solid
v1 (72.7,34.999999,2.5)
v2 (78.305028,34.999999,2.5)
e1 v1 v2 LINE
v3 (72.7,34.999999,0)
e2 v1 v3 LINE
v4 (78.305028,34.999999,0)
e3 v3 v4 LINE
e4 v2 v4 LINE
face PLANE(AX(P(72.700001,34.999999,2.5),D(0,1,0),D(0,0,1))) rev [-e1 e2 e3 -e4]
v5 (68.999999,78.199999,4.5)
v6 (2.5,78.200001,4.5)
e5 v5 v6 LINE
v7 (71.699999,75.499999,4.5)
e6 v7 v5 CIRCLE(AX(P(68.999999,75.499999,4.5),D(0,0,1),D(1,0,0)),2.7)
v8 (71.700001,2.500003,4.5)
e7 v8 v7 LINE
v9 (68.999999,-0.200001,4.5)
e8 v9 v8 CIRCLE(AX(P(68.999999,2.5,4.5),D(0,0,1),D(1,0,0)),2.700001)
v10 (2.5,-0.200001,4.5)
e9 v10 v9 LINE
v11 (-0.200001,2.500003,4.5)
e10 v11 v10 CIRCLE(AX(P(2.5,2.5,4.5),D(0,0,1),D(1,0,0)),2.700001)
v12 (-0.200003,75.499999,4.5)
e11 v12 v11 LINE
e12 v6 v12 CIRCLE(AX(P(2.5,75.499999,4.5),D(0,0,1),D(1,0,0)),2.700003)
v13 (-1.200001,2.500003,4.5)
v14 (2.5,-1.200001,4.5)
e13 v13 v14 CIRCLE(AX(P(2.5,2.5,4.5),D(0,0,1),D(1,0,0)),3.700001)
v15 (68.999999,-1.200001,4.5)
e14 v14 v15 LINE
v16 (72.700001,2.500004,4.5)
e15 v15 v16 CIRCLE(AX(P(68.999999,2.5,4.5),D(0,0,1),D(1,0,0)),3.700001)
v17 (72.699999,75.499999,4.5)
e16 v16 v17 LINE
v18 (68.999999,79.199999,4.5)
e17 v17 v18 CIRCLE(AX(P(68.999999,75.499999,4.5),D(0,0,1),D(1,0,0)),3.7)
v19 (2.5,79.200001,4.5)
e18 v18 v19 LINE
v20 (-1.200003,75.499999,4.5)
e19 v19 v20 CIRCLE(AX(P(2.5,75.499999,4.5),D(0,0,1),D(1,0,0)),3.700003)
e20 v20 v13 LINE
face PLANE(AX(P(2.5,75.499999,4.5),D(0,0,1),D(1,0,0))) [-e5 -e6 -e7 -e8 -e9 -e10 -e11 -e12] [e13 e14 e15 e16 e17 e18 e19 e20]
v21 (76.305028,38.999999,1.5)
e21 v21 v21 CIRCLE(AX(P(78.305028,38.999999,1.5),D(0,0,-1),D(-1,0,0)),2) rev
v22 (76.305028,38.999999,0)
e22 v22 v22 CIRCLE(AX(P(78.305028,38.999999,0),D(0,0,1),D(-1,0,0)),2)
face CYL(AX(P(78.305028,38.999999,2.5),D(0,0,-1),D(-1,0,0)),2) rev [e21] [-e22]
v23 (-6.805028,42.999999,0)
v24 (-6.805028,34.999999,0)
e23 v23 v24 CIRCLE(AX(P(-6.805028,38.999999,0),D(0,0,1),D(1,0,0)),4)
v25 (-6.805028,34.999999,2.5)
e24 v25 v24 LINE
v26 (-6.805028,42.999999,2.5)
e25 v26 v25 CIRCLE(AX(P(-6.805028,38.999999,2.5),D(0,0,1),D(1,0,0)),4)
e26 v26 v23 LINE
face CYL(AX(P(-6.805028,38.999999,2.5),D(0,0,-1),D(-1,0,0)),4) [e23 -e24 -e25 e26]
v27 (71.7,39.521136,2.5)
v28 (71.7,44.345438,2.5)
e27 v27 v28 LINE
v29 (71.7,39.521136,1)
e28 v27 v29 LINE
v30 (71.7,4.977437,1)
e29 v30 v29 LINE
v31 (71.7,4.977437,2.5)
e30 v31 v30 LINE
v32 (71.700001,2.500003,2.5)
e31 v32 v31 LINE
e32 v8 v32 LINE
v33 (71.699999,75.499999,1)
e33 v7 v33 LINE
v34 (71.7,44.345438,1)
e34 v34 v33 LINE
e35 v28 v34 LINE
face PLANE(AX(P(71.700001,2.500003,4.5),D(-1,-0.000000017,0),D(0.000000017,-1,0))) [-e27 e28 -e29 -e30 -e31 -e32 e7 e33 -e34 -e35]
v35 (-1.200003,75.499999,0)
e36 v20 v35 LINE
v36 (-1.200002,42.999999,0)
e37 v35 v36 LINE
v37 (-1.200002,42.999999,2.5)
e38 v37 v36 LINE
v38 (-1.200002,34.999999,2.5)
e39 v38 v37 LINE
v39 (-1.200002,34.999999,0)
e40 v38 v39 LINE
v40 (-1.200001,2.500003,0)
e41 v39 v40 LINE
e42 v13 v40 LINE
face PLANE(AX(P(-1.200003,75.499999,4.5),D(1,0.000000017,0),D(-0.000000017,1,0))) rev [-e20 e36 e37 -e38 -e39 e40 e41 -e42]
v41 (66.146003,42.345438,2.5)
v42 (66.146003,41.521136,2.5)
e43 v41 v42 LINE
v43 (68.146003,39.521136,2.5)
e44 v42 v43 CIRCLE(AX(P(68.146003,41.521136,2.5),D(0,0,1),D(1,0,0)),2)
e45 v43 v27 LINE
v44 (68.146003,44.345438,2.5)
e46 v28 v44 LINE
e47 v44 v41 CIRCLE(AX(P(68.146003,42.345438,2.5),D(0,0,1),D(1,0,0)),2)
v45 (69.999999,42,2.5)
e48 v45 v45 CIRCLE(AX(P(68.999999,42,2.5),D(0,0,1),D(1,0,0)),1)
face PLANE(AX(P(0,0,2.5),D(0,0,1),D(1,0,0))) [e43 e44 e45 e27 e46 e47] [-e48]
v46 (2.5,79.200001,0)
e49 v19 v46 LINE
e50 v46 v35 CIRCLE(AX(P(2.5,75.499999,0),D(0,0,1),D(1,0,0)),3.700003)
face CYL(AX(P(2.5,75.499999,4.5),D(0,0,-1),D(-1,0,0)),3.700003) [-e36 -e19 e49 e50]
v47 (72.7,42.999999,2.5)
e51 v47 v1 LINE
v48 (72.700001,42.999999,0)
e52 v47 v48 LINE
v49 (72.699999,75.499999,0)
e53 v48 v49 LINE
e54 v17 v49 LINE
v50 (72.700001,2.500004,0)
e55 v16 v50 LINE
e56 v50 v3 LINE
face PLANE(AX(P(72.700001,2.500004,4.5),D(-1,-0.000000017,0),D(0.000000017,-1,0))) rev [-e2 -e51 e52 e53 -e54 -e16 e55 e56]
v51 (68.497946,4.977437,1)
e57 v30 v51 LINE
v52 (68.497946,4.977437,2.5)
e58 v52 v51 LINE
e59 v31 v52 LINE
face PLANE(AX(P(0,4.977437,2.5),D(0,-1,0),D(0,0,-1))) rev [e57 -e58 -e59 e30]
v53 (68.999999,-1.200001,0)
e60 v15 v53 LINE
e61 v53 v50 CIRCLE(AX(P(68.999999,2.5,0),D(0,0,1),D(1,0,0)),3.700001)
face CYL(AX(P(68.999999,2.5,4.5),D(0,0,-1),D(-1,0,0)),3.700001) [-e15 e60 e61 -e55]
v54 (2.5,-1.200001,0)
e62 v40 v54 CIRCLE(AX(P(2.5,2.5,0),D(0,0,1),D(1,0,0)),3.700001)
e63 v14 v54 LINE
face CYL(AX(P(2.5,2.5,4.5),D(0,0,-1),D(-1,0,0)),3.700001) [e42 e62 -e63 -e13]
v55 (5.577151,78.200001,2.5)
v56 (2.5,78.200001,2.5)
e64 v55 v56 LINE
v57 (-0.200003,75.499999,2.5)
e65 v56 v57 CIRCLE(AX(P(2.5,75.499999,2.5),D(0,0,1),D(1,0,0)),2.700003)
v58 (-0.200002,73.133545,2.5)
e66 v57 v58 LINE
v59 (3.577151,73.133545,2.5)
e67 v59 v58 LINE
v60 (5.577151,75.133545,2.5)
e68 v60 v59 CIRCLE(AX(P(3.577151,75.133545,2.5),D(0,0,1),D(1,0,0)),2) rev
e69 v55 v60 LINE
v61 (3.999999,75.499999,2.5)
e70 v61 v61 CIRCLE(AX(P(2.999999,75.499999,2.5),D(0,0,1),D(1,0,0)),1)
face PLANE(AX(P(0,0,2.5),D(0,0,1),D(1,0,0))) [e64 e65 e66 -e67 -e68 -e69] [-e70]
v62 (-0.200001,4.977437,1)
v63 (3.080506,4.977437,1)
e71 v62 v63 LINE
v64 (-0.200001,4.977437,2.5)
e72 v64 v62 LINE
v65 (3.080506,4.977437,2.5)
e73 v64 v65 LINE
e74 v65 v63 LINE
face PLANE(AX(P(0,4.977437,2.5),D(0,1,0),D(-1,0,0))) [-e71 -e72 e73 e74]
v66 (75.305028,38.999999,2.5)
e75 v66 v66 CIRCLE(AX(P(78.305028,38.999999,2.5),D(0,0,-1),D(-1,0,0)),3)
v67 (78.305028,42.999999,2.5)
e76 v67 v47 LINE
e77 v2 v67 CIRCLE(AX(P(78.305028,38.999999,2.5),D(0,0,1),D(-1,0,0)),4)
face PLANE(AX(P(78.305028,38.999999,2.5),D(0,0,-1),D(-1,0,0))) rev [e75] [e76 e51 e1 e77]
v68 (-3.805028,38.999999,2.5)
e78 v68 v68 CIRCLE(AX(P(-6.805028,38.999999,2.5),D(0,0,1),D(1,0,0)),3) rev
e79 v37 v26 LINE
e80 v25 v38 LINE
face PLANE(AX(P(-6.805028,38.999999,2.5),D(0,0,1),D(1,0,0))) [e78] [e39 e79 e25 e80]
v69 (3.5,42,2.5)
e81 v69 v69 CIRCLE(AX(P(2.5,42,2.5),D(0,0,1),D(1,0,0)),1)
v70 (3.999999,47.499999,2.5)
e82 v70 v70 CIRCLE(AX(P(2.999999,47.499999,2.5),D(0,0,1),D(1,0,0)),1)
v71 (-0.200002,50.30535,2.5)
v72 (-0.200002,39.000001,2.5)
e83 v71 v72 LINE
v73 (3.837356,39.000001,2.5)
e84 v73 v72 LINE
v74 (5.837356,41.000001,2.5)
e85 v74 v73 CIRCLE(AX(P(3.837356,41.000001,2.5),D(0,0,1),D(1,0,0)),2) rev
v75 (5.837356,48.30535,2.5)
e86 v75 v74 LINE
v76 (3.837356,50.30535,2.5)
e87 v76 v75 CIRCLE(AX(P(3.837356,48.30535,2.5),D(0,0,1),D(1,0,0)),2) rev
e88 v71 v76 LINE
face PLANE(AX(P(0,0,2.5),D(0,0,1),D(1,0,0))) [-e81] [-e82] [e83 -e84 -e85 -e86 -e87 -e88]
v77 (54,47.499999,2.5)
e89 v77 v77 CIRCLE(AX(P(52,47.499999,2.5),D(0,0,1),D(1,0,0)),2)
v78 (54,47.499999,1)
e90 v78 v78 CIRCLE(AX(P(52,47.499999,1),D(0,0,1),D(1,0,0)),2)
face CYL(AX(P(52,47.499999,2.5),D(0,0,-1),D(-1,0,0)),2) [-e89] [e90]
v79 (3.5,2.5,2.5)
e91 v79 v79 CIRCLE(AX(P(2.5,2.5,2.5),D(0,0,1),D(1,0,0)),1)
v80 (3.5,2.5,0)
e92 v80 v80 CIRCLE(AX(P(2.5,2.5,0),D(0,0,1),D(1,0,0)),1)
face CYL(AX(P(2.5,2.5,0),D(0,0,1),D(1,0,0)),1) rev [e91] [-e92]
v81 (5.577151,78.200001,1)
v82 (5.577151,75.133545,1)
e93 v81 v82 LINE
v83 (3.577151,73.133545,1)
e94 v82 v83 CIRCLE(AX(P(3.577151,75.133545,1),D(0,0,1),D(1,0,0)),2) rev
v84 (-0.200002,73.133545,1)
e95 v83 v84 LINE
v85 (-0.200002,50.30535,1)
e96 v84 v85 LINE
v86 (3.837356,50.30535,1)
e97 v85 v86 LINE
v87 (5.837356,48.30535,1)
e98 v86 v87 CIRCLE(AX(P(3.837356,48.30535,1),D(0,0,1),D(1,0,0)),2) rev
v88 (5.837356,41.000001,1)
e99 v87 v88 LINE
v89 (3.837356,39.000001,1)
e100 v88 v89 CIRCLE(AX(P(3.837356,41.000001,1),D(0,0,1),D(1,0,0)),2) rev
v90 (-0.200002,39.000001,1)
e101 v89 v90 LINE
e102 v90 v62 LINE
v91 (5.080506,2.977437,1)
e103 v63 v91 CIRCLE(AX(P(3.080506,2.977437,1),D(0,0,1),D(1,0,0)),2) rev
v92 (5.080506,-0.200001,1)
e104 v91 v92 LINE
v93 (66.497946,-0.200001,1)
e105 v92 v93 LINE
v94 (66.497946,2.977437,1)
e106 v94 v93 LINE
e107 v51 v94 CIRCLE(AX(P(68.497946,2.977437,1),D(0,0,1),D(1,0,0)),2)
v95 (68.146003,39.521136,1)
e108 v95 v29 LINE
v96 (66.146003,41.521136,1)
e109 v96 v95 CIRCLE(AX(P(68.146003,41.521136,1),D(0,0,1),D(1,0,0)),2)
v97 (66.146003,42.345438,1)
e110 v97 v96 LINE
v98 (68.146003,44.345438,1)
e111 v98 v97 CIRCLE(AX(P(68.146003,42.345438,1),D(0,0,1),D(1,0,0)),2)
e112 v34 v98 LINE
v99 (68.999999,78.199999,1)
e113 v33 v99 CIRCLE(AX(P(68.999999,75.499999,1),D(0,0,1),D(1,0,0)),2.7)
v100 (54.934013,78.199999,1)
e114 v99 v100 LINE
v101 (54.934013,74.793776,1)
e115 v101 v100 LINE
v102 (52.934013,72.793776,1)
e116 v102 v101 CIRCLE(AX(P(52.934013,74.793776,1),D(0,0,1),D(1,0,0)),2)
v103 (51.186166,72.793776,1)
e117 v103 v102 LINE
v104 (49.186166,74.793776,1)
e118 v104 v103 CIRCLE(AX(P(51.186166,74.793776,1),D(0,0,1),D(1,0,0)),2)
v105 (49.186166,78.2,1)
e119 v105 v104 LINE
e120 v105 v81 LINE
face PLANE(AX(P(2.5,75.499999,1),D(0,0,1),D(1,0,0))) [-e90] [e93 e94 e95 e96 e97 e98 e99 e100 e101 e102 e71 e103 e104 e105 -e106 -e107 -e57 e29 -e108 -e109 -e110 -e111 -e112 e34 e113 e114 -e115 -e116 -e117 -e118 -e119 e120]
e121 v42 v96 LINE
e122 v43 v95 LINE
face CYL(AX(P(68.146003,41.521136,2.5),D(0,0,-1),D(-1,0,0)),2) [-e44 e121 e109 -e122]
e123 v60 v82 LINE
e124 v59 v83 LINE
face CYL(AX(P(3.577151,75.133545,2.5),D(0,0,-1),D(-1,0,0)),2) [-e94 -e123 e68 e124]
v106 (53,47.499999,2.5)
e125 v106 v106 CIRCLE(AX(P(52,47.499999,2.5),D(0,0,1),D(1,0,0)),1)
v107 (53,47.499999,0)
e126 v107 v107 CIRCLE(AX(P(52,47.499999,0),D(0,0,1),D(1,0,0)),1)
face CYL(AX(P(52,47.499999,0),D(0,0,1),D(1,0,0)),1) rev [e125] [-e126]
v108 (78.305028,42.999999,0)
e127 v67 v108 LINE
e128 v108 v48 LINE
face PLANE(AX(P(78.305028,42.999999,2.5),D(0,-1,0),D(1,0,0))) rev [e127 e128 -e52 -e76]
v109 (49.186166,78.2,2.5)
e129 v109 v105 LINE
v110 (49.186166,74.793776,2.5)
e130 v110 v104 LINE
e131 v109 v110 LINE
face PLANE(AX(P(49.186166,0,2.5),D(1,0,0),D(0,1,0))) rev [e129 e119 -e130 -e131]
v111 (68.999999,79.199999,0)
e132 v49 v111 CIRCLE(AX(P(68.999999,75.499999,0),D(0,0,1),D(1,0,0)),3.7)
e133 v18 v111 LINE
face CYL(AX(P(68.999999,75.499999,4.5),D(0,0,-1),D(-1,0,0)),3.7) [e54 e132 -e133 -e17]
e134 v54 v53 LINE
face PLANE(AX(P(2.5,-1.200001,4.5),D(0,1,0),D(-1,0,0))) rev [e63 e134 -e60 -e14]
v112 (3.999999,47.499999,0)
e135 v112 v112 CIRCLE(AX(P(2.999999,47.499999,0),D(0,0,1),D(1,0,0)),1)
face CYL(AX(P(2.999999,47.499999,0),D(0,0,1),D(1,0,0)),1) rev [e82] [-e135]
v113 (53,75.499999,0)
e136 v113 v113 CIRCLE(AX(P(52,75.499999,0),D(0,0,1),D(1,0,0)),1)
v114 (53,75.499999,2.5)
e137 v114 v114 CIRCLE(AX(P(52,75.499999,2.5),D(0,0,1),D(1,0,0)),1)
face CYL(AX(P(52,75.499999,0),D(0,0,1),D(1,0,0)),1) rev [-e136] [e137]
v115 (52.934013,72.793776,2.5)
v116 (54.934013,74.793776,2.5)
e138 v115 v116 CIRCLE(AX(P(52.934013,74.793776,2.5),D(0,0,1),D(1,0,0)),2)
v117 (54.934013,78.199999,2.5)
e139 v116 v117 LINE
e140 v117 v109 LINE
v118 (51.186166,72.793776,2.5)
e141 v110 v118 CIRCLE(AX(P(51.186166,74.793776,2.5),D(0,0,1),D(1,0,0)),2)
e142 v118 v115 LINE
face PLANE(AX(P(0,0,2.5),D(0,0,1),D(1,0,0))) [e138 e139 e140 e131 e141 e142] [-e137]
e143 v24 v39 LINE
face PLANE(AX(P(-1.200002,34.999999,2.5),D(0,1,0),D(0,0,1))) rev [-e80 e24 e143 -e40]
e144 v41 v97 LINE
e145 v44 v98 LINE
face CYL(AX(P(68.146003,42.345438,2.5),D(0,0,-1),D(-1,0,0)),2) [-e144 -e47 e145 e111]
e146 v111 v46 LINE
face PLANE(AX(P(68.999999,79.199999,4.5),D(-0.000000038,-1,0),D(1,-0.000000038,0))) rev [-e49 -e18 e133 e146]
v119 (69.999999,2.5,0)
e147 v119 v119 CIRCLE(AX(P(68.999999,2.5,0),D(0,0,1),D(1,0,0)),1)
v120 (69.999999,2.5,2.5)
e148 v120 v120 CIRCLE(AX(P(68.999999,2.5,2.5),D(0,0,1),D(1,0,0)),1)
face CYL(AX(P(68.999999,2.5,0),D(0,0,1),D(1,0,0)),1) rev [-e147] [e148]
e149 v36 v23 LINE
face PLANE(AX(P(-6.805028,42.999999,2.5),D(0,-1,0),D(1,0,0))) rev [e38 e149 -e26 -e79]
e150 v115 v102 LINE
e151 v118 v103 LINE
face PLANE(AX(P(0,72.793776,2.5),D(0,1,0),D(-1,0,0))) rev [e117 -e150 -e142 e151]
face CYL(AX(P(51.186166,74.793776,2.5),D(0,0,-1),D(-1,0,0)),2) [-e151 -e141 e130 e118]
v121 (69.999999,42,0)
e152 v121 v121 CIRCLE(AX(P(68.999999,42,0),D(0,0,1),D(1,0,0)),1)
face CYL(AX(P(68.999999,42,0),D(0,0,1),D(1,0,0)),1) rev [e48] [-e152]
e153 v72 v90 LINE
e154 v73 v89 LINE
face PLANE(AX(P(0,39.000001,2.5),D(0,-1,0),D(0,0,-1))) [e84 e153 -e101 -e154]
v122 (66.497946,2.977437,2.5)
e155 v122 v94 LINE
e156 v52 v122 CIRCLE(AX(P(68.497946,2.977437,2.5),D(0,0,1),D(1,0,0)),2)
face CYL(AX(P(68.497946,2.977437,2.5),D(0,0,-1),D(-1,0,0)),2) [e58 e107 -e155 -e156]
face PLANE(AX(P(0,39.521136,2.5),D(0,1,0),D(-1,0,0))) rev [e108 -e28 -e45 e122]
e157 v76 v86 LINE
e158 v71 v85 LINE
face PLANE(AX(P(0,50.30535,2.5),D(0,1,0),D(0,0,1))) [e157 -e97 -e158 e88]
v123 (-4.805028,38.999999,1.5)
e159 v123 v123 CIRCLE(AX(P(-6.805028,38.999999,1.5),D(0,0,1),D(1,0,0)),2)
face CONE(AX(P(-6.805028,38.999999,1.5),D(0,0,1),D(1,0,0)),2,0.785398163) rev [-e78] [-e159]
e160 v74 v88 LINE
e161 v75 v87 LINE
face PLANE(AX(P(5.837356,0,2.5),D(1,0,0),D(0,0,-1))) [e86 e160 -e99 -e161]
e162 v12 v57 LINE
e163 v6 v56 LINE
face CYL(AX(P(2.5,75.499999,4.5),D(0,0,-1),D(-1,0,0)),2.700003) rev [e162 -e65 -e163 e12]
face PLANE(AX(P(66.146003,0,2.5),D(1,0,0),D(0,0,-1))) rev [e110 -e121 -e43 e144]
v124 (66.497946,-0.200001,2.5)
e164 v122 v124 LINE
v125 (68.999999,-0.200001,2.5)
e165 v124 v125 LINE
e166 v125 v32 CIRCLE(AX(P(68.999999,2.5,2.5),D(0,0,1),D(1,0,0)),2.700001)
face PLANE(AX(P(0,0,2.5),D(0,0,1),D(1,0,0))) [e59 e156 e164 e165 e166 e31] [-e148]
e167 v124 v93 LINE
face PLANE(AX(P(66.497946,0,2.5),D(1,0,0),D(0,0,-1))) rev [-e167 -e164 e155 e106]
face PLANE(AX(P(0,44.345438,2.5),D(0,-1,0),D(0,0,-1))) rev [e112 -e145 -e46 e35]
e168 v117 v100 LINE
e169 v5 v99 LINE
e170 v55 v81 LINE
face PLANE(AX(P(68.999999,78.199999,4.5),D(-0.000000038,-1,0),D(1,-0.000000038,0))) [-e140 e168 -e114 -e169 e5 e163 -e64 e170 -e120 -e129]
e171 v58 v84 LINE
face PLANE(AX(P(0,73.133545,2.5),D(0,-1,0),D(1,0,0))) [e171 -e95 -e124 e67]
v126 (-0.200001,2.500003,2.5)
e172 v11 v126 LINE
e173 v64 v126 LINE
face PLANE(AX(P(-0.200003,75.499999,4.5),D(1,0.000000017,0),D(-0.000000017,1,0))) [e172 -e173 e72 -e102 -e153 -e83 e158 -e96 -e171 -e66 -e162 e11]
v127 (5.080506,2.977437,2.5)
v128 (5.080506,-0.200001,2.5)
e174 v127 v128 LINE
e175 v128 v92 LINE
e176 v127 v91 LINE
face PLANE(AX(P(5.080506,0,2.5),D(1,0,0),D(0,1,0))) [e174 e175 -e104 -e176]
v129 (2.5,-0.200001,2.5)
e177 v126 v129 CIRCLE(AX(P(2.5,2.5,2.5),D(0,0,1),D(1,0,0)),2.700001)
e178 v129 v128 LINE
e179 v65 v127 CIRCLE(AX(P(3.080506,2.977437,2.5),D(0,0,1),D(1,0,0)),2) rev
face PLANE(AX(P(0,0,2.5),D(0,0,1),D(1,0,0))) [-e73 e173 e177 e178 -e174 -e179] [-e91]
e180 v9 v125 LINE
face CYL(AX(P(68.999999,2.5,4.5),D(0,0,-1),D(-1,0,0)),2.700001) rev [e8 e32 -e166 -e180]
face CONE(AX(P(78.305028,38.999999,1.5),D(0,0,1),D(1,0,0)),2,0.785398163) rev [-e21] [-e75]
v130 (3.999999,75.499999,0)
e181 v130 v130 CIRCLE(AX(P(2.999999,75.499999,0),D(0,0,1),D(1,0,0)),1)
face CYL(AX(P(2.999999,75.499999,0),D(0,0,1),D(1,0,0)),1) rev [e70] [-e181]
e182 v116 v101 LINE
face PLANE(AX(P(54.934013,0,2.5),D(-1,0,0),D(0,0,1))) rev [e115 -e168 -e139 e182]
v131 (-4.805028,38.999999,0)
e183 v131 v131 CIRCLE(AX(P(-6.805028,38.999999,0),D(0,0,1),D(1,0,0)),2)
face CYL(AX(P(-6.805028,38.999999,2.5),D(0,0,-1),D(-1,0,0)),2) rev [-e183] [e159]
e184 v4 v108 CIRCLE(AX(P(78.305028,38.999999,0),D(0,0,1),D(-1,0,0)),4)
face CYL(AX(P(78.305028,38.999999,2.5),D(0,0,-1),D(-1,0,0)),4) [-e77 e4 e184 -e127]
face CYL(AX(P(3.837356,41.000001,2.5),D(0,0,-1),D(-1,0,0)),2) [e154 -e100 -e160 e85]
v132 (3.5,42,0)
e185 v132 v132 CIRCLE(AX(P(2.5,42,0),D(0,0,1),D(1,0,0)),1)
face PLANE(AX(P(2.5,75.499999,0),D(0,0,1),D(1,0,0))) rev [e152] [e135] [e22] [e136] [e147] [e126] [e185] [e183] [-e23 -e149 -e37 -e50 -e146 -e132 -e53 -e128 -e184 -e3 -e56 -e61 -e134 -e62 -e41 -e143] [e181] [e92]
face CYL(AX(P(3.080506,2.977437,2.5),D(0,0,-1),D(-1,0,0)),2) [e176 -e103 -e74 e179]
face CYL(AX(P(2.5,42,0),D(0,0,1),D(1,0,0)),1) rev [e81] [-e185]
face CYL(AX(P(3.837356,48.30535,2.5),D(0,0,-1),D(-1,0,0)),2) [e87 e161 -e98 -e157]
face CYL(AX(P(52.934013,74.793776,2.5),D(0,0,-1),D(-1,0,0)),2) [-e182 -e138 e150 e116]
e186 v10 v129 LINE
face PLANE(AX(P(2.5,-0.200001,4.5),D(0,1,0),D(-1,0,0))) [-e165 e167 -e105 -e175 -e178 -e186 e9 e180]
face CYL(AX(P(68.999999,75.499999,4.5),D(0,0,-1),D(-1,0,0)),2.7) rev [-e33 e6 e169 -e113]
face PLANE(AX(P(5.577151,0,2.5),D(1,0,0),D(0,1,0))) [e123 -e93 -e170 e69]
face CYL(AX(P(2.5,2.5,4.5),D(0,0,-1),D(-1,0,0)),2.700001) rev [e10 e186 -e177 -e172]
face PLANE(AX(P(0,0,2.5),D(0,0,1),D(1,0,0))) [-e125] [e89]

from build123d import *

# Parameters (mm, degrees)
EXTRUDE_1_DEPTH     = 1
EXTRUDE_2_DEPTH     = 4.5
SKETCH_4_R          = 2
EXTRUDE_3_DEPTH     = 2.5
CHAMFER_1_SIZE      = 1
EXTRUDE_4_OUTLINE_R = 2
EXTRUDE_4_DEPTH     = 1.5
SKETCH_6_R          = 1
CUT_EXTRUDE_1_DEPTH = 115.249760713


# Read off the part's stored shape, not the designer's step: Бобышка-Вытянуть4
with BuildPart() as part:
    # Эскиз2 → Бобышка-Вытянуть1 (new body)
    with BuildSketch(Plane.XY):
        with BuildLine():
            Line((2.50000008, 78.20000148), (68.99999916, 78.19999894))
            ThreePointArc((68.99999916, 78.19999894), (70.909187526, 77.409187226), (71.69999924, 75.49999886))
            Line((71.69999924, 75.49999886), (71.70000051, 2.500002823))
            ThreePointArc((71.70000051, 2.500002823), (70.909189394, 0.590811786), (68.99999916, -0.20000127))
            Line((68.99999916, -0.20000127), (2.50000008, -0.20000127))
            ThreePointArc((2.50000008, -0.20000127), (0.590809846, 0.590811786), (-0.20000127, 2.500002823))
            Line((-0.20000127, 2.500002823), (-0.20000254, 75.49999886))
            ThreePointArc((-0.20000254, 75.49999886), (0.590809918, 77.409189022), (2.50000008, 78.20000148))
        make_face()
    extrude(amount=EXTRUDE_1_DEPTH)

    # Эскиз3 → Бобышка-Вытянуть2 (add)
    with BuildSketch(Plane.XY):
        with BuildLine():
            Line((-1.20000254, 75.49999886), (-1.20000127, 2.500002806))
            ThreePointArc((-1.20000127, 2.500002806), (-0.116296929, -0.116295001), (2.50000008, -1.20000127))
            Line((2.50000008, -1.20000127), (68.99999916, -1.20000127))
            ThreePointArc((68.99999916, -1.20000127), (71.616296534, -0.116294636), (72.70000051, 2.500003839))
            Line((72.70000051, 2.500003839), (72.69999924, 75.499998877))
            ThreePointArc((72.69999924, 75.499998877), (71.616294301, 78.116294013), (68.99999916, 79.19999894))
            Line((68.99999916, 79.19999894), (2.50000008, 79.20000148))
            ThreePointArc((2.50000008, 79.20000148), (-0.116296863, 78.116295803), (-1.20000254, 75.49999886))
        make_face()
        with BuildLine():
            Line((-0.20000254, 75.49999886), (-0.20000127, 2.500002823))
            ThreePointArc((-0.20000127, 2.500002823), (0.590809846, 0.590811786), (2.50000008, -0.20000127))
            Line((2.50000008, -0.20000127), (68.99999916, -0.20000127))
            ThreePointArc((68.99999916, -0.20000127), (70.909189394, 0.590811786), (71.70000051, 2.500002823))
            Line((71.70000051, 2.500002823), (71.69999924, 75.49999886))
            ThreePointArc((71.69999924, 75.49999886), (70.909187526, 77.409187226), (68.99999916, 78.19999894))
            Line((68.99999916, 78.19999894), (2.50000008, 78.20000148))
            ThreePointArc((2.50000008, 78.20000148), (0.590809918, 77.409189022), (-0.20000254, 75.49999886))
        make_face(mode=Mode.SUBTRACT)
    extrude(amount=EXTRUDE_2_DEPTH)


with BuildPart() as extrude_3_tool:
    # Эскиз4 → Бобышка-Вытянуть3 (new body)
    # profile 1 of 2: a face of its own
    with BuildSketch(Plane.XY):
        with BuildLine():
            Line((-6.805028483, 42.99999886), (-1.200001975, 42.99999886))
            Line((-1.200001975, 42.99999886), (-1.200001835, 34.99999886))
            Line((-1.200001835, 34.99999886), (-6.805028483, 34.99999886))
            ThreePointArc((-6.805028483, 34.99999886), (-10.805028483, 38.99999886), (-6.805028483, 42.99999886))
        make_face()
        with Locations((-6.805028483, 38.99999886)):
            Circle(SKETCH_4_R, mode=Mode.SUBTRACT)
    # profile 2 of 2: a face of its own
    with BuildSketch(Plane.XY):
        with BuildLine():
            Line((72.700001075, 34.99999886), (78.305027723, 34.99999886))
            ThreePointArc((78.305027723, 34.99999886), (82.305027723, 38.99999886), (78.305027723, 42.99999886))
            Line((78.305027723, 42.99999886), (72.700001215, 42.99999886))
            Line((72.700001215, 42.99999886), (72.700001075, 34.99999886))
        make_face()
        with Locations(Location((78.305027723, 38.99999886, 0), (0, 0, 180))):
            Circle(SKETCH_4_R, mode=Mode.SUBTRACT)
    extrude(amount=EXTRUDE_3_DEPTH)


with BuildPart() as part_1:
    add(part.part)


with BuildPart() as part_2:
    # Бобышка-Вытянуть3: joined with extrude_3_tool
    add(part_1.part.fuse(extrude_3_tool.part, tol=0.00001))

    # Фаска1
    chamfer_1_edges = [part_2.edges().sort_by_distance(p)[0] for p in [
        (-8.805028483, 38.99999886, 2.5),
        (80.305027723, 38.99999886, 2.5),
    ]]
    chamfer(chamfer_1_edges, length=CHAMFER_1_SIZE)

    # Бобышка-Вытянуть4 outline → Бобышка-Вытянуть4 (add)
    with BuildSketch(Plane.XY.offset(1)):
        with BuildLine():
            Line((68.14600291, 39.521136107), (71.699999866, 39.521136107))
            Line((71.699999866, 39.521136107), (71.699999782, 44.345437587))
            Line((71.699999782, 44.345437587), (68.14600291, 44.345437587))
            ThreePointArc((68.14600291, 44.345437587), (66.731789347, 43.75965115), (66.14600291, 42.345437587))
            Line((66.14600291, 42.345437587), (66.14600291, 41.521136107))
            ThreePointArc((66.14600291, 41.521136107), (66.731789347, 40.106922544), (68.14600291, 39.521136107))
        make_face()
        with BuildLine():
            Line((66.497946234, 2.977437415), (66.497946234, -0.20000127))
            Line((66.497946234, -0.20000127), (68.99999916, -0.20000127))
            ThreePointArc((68.99999916, -0.20000127), (70.909189394, 0.590811786), (71.70000051, 2.500002823))
            Line((71.70000051, 2.500002823), (71.700000467, 4.977437415))
            Line((71.700000467, 4.977437415), (68.497946234, 4.977437415))
            ThreePointArc((68.497946234, 4.977437415), (67.083732671, 4.391650978), (66.497946234, 2.977437415))
        make_face()
        with BuildLine():
            Line((54.934013046, 78.199999477), (49.186165717, 78.199999697))
            Line((49.186165717, 78.199999697), (49.186165717, 74.793776217))
            ThreePointArc((49.186165717, 74.793776217), (49.771952154, 73.379562654), (51.186165717, 72.793776217))
            Line((51.186165717, 72.793776217), (52.934013046, 72.793776217))
            ThreePointArc((52.934013046, 72.793776217), (54.348226608, 73.379562655), (54.934013046, 74.793776217))
            Line((54.934013046, 74.793776217), (54.934013046, 78.199999477))
        make_face()
        with BuildLine():
            Line((-0.20000254, 75.49999886), (-0.200002499, 73.133544525))
            Line((-0.200002499, 73.133544525), (3.577150519, 73.133544525))
            ThreePointArc((3.577150519, 73.133544525), (4.991364081, 73.719330963), (5.577150519, 75.133544525))
            Line((5.577150519, 75.133544525), (5.577150519, 78.200001362))
            Line((5.577150519, 78.200001362), (2.50000008, 78.20000148))
            ThreePointArc((2.50000008, 78.20000148), (0.590809918, 77.409189022), (-0.20000254, 75.49999886))
        make_face()
        with BuildLine():
            Line((-0.200002102, 50.30535038), (-0.200001905, 39.000000842))
            Line((-0.200001905, 39.000000842), (3.837355963, 39.000000842))
            ThreePointArc((3.837355963, 39.000000842), (5.251569526, 39.585787279), (5.837355963, 41.000000842))
            Line((5.837355963, 41.000000842), (5.837355963, 48.30535038))
            ThreePointArc((5.837355963, 48.30535038), (5.251569526, 49.719563943), (3.837355963, 50.30535038))
            Line((3.837355963, 50.30535038), (-0.200002102, 50.30535038))
        make_face()
        with BuildLine():
            ThreePointArc((5.080506282, 2.977437415), (4.494719845, 4.391650977), (3.080506282, 4.977437415))
            Line((3.080506282, 4.977437415), (-0.200001313, 4.977437415))
            Line((-0.200001313, 4.977437415), (-0.20000127, 2.500002823))
            ThreePointArc((-0.20000127, 2.500002823), (0.590809846, 0.590811786), (2.50000008, -0.20000127))
            Line((2.50000008, -0.20000127), (5.080506282, -0.20000127))
            Line((5.080506282, -0.20000127), (5.080506282, 2.977437415))
        make_face()
        with Locations((52.00000014, 47.49999898)):
            Circle(EXTRUDE_4_OUTLINE_R)
    extrude(amount=EXTRUDE_4_DEPTH)

    # Эскиз6 → Вырез-Вытянуть1 (cut, through all)
    with BuildSketch(Plane.XY.offset(2.5)):
        with Locations((52.00000014, 75.49999886)):
            Circle(SKETCH_6_R)
        with Locations((2.99999908, 75.49999886)):
            Circle(SKETCH_6_R)
        with Locations((2.99999908, 47.49999898)):
            Circle(SKETCH_6_R)
        with Locations((2.50000008, 41.99999982)):
            Circle(SKETCH_6_R)
        with Locations((2.50000008, 2.50000008)):
            Circle(SKETCH_6_R)
        with Locations((68.99999916, 2.50000008)):
            Circle(SKETCH_6_R)
        with Locations((68.99999916, 41.99999982)):
            Circle(SKETCH_6_R)
        with Locations((52.00000014, 47.49999898)):
            Circle(SKETCH_6_R)
    extrude(amount=-CUT_EXTRUDE_1_DEPTH, mode=Mode.SUBTRACT)


solid = part_2.part
